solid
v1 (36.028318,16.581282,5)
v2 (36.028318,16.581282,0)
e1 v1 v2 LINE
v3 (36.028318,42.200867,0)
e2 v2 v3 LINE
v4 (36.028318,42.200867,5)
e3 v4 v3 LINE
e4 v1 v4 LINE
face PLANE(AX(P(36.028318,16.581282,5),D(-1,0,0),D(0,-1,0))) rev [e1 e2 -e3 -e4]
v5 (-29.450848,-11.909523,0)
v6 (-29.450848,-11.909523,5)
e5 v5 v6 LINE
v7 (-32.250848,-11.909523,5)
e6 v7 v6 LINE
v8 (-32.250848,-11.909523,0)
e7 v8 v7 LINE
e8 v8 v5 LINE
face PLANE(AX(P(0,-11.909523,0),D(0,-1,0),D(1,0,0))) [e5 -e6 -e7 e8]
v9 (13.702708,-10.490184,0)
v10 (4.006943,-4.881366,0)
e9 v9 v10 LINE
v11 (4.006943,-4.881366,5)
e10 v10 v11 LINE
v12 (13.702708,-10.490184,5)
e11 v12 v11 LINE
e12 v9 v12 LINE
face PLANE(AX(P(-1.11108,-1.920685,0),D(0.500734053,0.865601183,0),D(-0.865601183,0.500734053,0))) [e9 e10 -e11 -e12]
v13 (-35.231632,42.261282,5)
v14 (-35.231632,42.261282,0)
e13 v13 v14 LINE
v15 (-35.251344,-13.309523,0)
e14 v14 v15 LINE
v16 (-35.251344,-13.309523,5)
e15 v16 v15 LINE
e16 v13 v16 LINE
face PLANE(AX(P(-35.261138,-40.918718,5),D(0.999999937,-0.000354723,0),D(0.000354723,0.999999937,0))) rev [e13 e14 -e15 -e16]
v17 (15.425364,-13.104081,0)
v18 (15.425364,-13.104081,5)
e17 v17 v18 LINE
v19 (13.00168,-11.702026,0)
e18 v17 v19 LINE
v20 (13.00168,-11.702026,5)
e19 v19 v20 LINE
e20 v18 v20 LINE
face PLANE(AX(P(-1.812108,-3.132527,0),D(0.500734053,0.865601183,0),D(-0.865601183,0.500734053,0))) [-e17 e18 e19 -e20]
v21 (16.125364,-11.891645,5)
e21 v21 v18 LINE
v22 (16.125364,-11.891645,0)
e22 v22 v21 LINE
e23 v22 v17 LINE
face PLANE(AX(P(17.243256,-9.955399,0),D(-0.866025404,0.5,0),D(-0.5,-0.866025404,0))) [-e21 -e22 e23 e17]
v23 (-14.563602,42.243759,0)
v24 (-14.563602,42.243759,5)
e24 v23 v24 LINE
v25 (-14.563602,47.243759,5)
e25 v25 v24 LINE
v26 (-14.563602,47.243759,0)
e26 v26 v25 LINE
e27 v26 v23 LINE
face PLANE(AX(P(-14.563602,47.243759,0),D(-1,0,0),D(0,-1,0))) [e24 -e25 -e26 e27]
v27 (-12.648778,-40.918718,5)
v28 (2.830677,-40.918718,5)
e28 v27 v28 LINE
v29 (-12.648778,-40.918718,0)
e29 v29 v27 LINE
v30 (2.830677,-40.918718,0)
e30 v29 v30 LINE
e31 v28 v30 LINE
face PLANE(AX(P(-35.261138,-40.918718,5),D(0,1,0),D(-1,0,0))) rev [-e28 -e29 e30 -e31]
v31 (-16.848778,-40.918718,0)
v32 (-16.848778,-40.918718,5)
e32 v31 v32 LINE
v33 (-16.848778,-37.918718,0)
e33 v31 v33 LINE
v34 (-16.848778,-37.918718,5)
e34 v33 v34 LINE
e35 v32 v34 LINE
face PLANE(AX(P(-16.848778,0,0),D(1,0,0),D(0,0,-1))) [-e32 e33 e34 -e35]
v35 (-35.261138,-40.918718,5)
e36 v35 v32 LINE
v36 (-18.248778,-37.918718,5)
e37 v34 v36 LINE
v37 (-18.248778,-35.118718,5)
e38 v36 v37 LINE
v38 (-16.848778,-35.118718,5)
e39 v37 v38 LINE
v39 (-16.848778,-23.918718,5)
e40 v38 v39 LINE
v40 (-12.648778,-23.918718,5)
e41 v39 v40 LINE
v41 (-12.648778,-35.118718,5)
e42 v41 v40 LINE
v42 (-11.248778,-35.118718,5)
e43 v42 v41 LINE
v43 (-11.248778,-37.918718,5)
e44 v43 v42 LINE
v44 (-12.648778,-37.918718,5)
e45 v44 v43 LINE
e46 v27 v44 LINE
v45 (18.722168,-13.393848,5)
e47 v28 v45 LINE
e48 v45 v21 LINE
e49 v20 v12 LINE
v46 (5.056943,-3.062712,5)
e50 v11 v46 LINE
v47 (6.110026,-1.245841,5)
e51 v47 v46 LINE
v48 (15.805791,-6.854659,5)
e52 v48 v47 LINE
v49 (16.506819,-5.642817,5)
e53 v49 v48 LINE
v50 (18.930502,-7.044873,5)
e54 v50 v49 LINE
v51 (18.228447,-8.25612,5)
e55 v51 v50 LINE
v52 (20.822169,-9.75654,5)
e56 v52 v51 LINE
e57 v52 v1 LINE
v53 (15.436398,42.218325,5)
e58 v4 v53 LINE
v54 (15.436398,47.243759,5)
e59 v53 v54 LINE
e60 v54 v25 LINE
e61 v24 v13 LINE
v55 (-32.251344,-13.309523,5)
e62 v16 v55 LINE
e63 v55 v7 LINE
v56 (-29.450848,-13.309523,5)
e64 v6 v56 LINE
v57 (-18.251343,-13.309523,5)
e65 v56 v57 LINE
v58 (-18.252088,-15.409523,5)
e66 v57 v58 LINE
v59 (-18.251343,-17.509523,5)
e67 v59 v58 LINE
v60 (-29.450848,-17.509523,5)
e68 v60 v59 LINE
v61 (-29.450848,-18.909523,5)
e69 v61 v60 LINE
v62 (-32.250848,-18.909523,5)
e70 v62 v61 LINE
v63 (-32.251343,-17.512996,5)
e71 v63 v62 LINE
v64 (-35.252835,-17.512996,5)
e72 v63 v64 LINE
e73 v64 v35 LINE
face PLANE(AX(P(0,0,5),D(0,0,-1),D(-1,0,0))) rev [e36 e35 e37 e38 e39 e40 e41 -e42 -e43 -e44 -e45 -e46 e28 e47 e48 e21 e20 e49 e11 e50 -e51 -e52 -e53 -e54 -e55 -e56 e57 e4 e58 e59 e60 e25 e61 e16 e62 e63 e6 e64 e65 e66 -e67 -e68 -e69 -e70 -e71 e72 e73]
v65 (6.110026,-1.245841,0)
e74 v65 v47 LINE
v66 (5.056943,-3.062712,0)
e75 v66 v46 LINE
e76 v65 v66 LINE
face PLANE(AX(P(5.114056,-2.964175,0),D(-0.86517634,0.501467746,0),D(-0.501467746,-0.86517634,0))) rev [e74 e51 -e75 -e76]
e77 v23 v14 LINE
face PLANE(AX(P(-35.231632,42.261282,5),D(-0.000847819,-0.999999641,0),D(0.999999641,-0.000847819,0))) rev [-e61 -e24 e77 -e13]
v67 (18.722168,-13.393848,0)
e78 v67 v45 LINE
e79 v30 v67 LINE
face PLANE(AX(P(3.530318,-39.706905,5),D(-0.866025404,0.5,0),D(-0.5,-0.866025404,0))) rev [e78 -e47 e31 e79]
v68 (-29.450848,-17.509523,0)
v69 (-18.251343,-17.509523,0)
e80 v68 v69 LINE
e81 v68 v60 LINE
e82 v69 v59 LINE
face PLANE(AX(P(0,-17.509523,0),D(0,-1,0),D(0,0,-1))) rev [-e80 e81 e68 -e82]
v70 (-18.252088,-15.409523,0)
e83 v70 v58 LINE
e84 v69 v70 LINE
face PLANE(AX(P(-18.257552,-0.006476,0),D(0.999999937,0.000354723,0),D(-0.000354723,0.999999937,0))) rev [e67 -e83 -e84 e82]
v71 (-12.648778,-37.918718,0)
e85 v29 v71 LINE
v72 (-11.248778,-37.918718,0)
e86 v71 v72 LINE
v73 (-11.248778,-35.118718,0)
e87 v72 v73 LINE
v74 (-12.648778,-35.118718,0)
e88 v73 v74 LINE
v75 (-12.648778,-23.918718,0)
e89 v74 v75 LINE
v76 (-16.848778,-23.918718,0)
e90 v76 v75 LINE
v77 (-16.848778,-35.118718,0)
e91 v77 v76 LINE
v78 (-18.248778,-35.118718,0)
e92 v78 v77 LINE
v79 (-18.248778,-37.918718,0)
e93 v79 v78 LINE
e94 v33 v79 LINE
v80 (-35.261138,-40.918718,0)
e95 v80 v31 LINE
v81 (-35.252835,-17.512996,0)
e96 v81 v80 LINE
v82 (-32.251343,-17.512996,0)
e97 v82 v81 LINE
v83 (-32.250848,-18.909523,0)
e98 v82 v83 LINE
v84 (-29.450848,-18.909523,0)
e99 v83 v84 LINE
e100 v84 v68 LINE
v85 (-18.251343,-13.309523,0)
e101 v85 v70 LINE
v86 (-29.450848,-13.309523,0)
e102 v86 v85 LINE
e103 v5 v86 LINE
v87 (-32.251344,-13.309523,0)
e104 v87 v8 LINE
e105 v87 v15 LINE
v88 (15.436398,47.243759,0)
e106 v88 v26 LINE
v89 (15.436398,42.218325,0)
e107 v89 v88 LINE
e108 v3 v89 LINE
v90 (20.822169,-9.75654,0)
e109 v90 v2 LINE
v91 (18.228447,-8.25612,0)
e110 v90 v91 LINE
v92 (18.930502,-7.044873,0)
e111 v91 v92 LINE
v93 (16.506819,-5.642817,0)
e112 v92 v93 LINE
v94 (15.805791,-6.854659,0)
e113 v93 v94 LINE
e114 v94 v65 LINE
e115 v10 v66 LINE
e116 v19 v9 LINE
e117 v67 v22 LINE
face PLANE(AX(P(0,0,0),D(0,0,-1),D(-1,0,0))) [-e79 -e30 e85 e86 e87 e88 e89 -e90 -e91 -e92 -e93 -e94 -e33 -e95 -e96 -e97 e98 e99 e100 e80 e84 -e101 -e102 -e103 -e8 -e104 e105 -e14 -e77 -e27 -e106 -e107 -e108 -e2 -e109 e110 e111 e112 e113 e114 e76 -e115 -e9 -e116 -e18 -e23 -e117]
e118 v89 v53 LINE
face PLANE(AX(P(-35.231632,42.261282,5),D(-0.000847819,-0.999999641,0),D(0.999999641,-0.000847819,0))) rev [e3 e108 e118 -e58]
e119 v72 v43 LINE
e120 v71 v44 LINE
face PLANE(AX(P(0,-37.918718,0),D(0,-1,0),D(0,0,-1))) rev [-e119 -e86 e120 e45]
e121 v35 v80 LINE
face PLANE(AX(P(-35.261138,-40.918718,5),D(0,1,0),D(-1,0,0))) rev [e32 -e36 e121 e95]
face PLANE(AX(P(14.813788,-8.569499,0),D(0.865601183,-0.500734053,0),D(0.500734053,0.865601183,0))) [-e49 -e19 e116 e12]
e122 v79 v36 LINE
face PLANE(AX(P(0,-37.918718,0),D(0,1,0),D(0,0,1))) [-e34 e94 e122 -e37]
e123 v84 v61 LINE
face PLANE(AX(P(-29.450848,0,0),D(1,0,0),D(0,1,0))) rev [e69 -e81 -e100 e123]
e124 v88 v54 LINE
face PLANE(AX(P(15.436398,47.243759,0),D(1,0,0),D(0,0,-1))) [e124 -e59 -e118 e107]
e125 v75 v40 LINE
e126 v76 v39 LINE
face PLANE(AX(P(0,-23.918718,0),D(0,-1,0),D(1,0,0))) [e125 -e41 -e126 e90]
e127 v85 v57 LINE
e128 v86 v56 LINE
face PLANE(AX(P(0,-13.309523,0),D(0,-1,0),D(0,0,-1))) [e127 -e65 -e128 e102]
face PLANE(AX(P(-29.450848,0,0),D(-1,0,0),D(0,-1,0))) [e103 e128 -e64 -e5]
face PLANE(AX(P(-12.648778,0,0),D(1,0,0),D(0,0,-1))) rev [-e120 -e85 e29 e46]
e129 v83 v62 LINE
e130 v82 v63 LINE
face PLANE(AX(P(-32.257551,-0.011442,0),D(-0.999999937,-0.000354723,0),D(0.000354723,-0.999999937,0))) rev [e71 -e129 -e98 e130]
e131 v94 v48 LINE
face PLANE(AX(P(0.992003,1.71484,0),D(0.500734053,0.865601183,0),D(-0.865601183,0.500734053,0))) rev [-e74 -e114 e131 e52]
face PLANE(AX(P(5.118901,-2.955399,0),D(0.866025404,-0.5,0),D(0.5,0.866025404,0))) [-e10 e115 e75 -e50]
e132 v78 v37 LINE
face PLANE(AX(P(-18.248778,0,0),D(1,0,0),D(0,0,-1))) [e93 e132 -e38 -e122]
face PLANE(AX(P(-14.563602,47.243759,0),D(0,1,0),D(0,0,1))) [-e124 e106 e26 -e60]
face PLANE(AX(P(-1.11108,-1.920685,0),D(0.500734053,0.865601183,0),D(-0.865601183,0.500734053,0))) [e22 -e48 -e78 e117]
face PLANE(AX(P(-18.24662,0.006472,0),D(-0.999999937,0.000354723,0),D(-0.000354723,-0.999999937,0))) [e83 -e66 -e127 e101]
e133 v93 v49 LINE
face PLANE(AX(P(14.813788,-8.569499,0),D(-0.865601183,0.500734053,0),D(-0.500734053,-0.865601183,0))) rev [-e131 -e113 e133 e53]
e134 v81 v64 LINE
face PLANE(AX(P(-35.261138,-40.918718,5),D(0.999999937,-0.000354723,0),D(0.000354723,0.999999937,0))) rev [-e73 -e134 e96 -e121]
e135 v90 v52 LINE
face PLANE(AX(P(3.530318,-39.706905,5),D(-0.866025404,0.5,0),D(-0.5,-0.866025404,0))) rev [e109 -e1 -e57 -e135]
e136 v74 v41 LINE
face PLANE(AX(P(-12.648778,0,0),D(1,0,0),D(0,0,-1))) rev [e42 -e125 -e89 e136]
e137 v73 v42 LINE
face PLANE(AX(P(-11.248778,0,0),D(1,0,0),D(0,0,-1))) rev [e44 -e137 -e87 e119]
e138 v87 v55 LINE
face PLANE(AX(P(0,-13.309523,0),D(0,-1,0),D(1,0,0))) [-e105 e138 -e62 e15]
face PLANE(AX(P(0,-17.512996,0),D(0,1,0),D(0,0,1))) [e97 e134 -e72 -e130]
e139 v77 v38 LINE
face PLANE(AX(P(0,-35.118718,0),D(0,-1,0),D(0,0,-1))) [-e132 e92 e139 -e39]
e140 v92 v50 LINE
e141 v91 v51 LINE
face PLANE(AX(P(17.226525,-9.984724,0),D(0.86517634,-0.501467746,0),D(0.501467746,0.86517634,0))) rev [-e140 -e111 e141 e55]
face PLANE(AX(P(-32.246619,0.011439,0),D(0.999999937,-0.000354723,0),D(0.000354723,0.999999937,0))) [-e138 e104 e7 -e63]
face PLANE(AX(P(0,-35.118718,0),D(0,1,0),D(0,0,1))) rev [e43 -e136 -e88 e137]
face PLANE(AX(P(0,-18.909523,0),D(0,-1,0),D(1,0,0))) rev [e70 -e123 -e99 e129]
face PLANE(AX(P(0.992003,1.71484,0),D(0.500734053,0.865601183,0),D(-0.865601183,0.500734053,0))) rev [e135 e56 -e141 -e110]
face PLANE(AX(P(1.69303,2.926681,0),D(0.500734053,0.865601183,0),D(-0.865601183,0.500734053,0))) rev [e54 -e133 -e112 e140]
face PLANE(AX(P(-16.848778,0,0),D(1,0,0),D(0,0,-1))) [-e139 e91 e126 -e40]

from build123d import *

# Parameters (mm, degrees)
BOSS_EXTRUDE1_DEPTH = 5
CUT_EXTRUDE3_START  = -5
CUT_EXTRUDE3_DEPTH  = 5
BOSS_EXTRUDE2_DEPTH = 5


# Read off the part's stored shape, not the designer's step: Cut-Extrude3
with BuildPart() as part:
    # Sketch1 → Boss-Extrude1 (new body)
    with BuildSketch(Plane.XY):
        Polygon((-35.261138019, -40.918717749), (2.830677256, -40.918717749), (3.530317734, -39.706904894), (36.028317734, 16.581282251), (36.028317734, 42.200866684), (-35.231632156, 42.261282251), align=None)
    extrude(amount=BOSS_EXTRUDE1_DEPTH)

    # Cut-Extrude3 outline → Cut-Extrude3 (cut)
    with BuildSketch(Plane.XY.offset(5).offset(CUT_EXTRUDE3_START)):
        Polygon((16.125363943, -11.891644937), (18.722168425, -13.393847636), (20.82216918, -9.756539633), (18.228446966, -8.256119968), (18.930502063, -7.044872657), (16.506818751, -5.642817308), (15.805791076, -6.854658964), (6.110026049, -1.245840704), (5.056943403, -3.062711671), (4.006943025, -4.881365673), (13.702708053, -10.490183932), (13.001680379, -11.702025589), (15.425363691, -13.104080938), align=None)
        Polygon((-35.251344401, -13.309523063), (-35.25283547, -17.512996385), (-32.25134298, -17.512996385), (-32.2508476, -18.909523063), (-29.4508476, -18.909523063), (-29.4508476, -17.509523063), (-18.251343332, -17.509523063), (-18.25208825, -15.409523063), (-18.251343332, -13.309523063), (-29.4508476, -13.309523063), (-29.4508476, -11.909523063), (-32.2508476, -11.909523063), (-32.251344213, -13.309523063), align=None)
        Polygon((-16.848777516, -40.918717749), (-12.648777516, -40.918717749), (-12.648777516, -37.918717749), (-11.248777516, -37.918717749), (-11.248777516, -35.118717749), (-12.648777516, -35.118717749), (-12.648777516, -23.918717749), (-16.848777516, -23.918717749), (-16.848777516, -35.118717749), (-18.248777516, -35.118717749), (-18.248777516, -37.918717749), (-16.848777516, -37.918717749), align=None)
    extrude(amount=CUT_EXTRUDE3_DEPTH, mode=Mode.SUBTRACT)

    # Sketch3 → Boss-Extrude2 (add)
    with BuildSketch(Plane.XY.offset(5)):
        Polygon((-14.56360213, 47.243759494), (15.43639787, 47.243759494), (15.43639787, 42.218324913), (-14.56360213, 42.243759494), align=None)
    extrude(amount=-BOSS_EXTRUDE2_DEPTH)


solid = part.part
